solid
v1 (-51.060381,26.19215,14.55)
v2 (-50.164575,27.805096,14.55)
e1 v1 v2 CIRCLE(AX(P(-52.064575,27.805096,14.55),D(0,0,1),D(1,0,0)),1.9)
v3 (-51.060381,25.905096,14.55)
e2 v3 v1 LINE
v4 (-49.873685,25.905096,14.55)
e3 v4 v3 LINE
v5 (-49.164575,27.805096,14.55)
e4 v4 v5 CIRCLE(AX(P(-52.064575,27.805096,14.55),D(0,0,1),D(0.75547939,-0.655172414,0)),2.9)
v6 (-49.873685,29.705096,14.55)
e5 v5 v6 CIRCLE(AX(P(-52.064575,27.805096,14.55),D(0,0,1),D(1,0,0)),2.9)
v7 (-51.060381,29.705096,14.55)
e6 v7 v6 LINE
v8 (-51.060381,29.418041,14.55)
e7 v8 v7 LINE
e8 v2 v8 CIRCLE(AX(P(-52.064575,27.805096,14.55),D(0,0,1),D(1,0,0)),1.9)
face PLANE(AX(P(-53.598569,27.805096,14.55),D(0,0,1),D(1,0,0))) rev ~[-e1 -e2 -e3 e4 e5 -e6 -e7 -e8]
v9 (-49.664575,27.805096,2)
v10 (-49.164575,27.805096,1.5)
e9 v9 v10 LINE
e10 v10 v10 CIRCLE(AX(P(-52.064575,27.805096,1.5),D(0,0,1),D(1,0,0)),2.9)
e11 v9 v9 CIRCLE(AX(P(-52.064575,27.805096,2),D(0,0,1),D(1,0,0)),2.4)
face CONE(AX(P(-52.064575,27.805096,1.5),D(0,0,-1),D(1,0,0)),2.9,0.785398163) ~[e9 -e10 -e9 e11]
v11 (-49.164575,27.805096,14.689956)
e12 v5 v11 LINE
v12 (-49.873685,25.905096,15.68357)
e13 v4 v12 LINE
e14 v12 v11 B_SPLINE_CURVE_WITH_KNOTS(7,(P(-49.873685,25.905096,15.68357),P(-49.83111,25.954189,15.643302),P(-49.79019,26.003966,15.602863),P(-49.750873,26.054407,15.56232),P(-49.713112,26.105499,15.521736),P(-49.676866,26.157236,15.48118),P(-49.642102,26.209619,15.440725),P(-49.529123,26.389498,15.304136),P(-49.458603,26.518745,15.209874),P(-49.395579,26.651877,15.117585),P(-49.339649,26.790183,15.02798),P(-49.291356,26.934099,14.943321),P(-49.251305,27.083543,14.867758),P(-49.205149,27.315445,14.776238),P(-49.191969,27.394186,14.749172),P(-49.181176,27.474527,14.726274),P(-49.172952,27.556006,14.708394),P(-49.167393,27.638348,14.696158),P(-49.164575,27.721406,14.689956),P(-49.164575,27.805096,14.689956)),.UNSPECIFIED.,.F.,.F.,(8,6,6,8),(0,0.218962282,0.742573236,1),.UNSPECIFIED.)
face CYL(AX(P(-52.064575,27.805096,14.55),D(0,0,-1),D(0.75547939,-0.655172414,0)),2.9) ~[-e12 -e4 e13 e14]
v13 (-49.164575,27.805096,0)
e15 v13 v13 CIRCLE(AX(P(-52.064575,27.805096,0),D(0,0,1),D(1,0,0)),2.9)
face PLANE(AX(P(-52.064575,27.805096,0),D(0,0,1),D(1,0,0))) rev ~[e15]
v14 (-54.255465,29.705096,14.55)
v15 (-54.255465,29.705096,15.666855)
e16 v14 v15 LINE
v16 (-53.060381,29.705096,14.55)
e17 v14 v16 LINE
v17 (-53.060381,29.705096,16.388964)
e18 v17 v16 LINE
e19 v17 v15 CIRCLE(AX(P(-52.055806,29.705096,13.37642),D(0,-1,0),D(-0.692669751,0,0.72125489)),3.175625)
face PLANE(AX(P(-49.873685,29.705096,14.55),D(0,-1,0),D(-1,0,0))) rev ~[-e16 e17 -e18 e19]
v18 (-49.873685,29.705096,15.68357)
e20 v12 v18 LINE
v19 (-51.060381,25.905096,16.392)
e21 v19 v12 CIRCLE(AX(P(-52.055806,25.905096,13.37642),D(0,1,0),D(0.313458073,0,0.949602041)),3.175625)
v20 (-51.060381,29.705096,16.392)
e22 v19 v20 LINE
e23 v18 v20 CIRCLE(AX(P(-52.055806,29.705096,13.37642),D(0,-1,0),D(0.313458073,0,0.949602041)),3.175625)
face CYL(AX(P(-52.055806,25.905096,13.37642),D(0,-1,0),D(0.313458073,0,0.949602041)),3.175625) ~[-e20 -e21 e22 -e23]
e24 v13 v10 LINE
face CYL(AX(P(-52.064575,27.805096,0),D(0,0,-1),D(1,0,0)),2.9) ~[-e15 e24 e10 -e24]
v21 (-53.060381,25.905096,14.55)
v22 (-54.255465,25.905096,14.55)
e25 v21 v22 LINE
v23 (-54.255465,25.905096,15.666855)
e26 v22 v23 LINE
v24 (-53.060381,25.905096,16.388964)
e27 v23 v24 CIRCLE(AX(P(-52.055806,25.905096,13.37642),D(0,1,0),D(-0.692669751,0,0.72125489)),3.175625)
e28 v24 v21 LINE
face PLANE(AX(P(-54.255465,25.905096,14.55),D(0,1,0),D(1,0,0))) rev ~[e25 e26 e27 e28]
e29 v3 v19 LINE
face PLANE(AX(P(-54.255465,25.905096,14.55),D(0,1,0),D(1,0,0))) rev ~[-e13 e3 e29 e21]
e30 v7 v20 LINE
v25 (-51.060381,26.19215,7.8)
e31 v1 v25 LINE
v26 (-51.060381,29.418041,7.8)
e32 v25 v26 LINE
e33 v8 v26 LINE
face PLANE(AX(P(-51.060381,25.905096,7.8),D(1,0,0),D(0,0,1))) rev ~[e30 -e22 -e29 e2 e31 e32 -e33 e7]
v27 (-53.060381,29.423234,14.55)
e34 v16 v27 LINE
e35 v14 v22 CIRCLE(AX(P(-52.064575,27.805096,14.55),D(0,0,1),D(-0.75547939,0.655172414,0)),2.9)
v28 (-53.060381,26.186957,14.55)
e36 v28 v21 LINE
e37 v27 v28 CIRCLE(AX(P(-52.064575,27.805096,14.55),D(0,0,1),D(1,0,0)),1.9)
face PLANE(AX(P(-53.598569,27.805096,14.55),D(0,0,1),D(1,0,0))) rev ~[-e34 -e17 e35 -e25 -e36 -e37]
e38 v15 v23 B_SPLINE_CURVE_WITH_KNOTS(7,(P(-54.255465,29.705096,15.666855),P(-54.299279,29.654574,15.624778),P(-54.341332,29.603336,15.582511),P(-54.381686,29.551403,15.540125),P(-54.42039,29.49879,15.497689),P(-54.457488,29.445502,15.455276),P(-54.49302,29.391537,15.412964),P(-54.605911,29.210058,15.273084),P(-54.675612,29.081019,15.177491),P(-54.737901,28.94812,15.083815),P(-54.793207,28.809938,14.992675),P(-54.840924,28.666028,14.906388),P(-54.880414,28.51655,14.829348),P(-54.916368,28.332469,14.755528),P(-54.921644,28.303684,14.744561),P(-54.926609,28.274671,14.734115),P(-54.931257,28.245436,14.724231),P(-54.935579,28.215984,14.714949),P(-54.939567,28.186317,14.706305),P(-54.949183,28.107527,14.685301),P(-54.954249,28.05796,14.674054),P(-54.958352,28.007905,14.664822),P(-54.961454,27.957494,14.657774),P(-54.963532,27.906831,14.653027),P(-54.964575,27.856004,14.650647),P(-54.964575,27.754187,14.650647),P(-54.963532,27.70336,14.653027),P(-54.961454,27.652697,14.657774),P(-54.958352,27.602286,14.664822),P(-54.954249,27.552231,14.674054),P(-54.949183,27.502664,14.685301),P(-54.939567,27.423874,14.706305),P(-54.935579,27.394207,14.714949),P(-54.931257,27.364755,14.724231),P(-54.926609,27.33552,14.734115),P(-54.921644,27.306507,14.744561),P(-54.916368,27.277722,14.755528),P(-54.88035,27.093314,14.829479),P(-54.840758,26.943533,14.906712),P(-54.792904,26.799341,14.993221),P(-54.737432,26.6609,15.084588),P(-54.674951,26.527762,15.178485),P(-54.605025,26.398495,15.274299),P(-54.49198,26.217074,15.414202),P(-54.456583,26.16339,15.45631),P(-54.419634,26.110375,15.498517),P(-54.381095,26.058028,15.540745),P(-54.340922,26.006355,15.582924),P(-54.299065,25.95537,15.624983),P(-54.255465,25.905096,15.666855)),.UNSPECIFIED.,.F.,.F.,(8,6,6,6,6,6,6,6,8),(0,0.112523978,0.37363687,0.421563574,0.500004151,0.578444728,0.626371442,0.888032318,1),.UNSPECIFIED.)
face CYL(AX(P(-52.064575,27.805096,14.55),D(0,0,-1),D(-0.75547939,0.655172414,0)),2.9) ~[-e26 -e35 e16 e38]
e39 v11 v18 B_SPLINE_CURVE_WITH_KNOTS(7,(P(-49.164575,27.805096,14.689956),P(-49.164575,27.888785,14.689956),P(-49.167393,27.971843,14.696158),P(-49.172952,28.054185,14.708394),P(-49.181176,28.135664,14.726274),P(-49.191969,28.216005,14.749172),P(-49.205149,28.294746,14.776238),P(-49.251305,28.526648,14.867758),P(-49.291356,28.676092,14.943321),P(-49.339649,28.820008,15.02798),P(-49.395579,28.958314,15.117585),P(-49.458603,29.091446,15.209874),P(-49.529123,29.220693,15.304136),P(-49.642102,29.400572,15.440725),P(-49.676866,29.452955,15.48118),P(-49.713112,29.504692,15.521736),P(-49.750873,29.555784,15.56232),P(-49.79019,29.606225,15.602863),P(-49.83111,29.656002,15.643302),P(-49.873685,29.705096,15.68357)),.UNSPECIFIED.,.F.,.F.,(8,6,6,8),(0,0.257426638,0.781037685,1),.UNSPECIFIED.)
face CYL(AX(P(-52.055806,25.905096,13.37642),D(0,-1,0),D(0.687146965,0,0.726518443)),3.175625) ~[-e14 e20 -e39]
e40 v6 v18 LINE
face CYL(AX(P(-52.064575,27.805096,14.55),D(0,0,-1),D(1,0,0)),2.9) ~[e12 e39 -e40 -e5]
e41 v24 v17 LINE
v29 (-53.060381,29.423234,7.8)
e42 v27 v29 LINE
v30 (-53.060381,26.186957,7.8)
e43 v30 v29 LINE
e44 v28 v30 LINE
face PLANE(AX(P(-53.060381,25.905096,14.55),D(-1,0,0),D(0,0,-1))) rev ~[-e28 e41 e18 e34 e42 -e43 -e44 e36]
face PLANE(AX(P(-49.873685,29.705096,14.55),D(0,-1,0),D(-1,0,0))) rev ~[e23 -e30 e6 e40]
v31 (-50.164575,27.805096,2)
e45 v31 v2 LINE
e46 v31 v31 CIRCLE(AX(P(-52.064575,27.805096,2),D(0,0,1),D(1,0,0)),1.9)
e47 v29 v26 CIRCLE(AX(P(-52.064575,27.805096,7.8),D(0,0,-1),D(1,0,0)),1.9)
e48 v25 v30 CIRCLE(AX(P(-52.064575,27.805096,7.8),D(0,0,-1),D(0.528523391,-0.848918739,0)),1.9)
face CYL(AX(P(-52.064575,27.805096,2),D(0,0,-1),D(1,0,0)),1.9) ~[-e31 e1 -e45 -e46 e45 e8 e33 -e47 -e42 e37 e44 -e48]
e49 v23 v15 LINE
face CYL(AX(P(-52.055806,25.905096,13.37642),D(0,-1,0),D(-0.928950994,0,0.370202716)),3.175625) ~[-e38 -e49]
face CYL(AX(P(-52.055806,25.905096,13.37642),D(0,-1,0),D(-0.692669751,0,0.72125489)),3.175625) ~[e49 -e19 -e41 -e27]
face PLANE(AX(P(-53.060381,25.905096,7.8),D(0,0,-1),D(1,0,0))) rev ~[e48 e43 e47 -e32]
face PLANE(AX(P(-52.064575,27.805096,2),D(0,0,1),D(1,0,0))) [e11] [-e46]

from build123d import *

# Parameters (mm, degrees)
F0_R     = 2.9
F1_DEPTH = 2
F2_R     = 1.9
F3_DEPTH = 12.55
F5_DEPTH = 2
F7_DEPTH = 25
F8_SIZE  = 0.5
F9_DEPTH = 25


# Not quite as in the source:
# - a feature names something its author has since deleted; it is built from what else it names


with BuildPart() as f1:
    # F0 (on Top) → F1 (new body)
    with BuildSketch(Plane.XY):
        with Locations((-52.0645752549, 27.8050955385)):
            Circle(F0_R)
    extrude(amount=F1_DEPTH)

    # F2 (on face) → F3 (join)
    with BuildSketch(Plane.XY.offset(2)):
        with Locations((-52.0645752549, 27.8050955385)):
            Circle(F2_R)
    extrude(amount=F3_DEPTH)

    # F4 (on face) → F5 (join)
    with BuildSketch(Plane.XY.offset(14.55)):
        with BuildLine():
            Line((-52.0645752549, 29.7050955385), (-54.2554654849, 29.7050955385))
            ThreePointArc((-54.2554654849, 29.7050955385), (-54.9645752549, 27.8050955385), (-54.2554654849, 25.9050955385))
            Line((-54.2554654849, 25.9050955385), (-52.0645752549, 25.9050955385))
            ThreePointArc((-52.0645752549, 25.9050955385), (-53.9645752549, 27.8050955385), (-52.0645752549, 29.7050955385))
        make_face()
        with BuildLine():
            ThreePointArc((-50.1645752549, 27.8050955385), (-50.7210723707, 29.1485984228), (-52.0645752549, 29.7050955385))
            ThreePointArc((-52.0645752549, 29.7050955385), (-53.9645752549, 27.8050955385), (-52.0645752549, 25.9050955385))
            ThreePointArc((-52.0645752549, 25.9050955385), (-50.7210723707, 26.4615926542), (-50.1645752549, 27.8050955385))
        make_face()
        with BuildLine():
            ThreePointArc((-49.8736850249, 25.9050955385), (-49.347630126, 26.7910890462), (-49.1645752549, 27.8050955385))
            ThreePointArc((-49.1645752549, 27.8050955385), (-49.347630126, 28.8191020308), (-49.8736850249, 29.7050955385))
            Line((-49.8736850249, 29.7050955385), (-52.0645752549, 29.7050955385))
            ThreePointArc((-52.0645752549, 29.7050955385), (-50.7210723707, 29.1485984228), (-50.1645752549, 27.8050955385))
            ThreePointArc((-50.1645752549, 27.8050955385), (-50.7210723707, 26.4615926542), (-52.0645752549, 25.9050955385))
            Line((-52.0645752549, 25.9050955385), (-49.8736850249, 25.9050955385))
        make_face()
    extrude(amount=F5_DEPTH)

    # F6 (on face) + F5_face1 (on face) → F7 (cut)
    with BuildSketch(Plane.XZ.offset(-25.9050955385)):
        with BuildLine():
            ThreePointArc((-53.0603808121, 16.3889640887), (-52.6208294658, 16.5013745209), (-52.1697451564, 16.55))
            Line((-52.1697451564, 16.55), (-53.0603808121, 16.55))
            Line((-53.0603808121, 16.55), (-53.0603808121, 16.3889640887))
        make_face()
        with BuildLine():
            Line((-51.0603808121, 16.55), (-51.9418670563, 16.55))
            ThreePointArc((-51.9418670563, 16.55), (-51.4955264095, 16.5022285059), (-51.0603808121, 16.3919996636))
            Line((-51.0603808121, 16.3919996636), (-51.0603808121, 16.55))
        make_face()
        with BuildLine():
            Line((-51.0603808121, 16.55), (-51.0603808121, 16.3919996636))
            ThreePointArc((-51.0603808121, 16.3919996636), (-50.428025883, 16.1031256959), (-49.8736850249, 15.6835698131))
            Line((-49.8736850249, 15.6835698131), (-49.8736850249, 16.55))
            Line((-49.8736850249, 16.55), (-51.0603808121, 16.55))
        make_face()
        with BuildLine():
            Line((-49.1058061063, 16.5520446822), (-52.0558061063, 16.5520446822))
            ThreePointArc((-52.0558061063, 16.5520446822), (-51.9988274089, 16.5515334705), (-51.9418670563, 16.55))
            Line((-51.9418670563, 16.55), (-51.0603808121, 16.55))
            Line((-51.0603808121, 16.55), (-49.8736850249, 16.55))
            Line((-49.8736850249, 16.55), (-49.8736850249, 15.6835698131))
            ThreePointArc((-49.8736850249, 15.6835698131), (-49.4281162504, 15.1596303152), (-49.1058061063, 14.5520446822))
            Line((-49.1058061063, 14.5520446822), (-49.1058061063, 16.5520446822))
        make_face()
        with BuildLine():
            Line((-54.2554654849, 16.55), (-54.2554654849, 15.666854741))
            ThreePointArc((-54.2554654849, 15.666854741), (-53.6981031241, 16.0944069239), (-53.0603808121, 16.3889640887))
            Line((-53.0603808121, 16.3889640887), (-53.0603808121, 16.55))
            Line((-53.0603808121, 16.55), (-54.2554654849, 16.55))
        make_face()
        with BuildLine():
            Line((-52.0558061063, 16.5520446822), (-55.0058061063, 16.5520446822))
            Line((-55.0058061063, 16.5520446822), (-55.0058061063, 14.5520446822))
            ThreePointArc((-55.0058061063, 14.5520446822), (-54.6902791648, 15.1495936288), (-54.2554654849, 15.666854741))
            Line((-54.2554654849, 15.666854741), (-54.2554654849, 16.55))
            Line((-54.2554654849, 16.55), (-53.0603808121, 16.55))
            Line((-53.0603808121, 16.55), (-52.1697451564, 16.55))
            ThreePointArc((-52.1697451564, 16.55), (-52.1127848038, 16.5515334705), (-52.0558061063, 16.5520446822))
        make_face()
        Polygon((-52.0645752549, 14.55), (-53.0603808121, 14.55), (-53.0603808121, 7.8), (-51.0603808121, 7.8), (-51.0603808121, 13.8), (-51.0603808121, 14.55), align=None)
    with BuildSketch(Plane(origin=(-52.0645752549, 29.7050955385, 15.55), x_dir=(-1, 0, 0), z_dir=(0, 1, 0))):
        Polygon((-2.19089023, 1), (-2.19089023, -1), (0, -1), (2.19089023, -1), (2.19089023, 1), align=None)
    extrude(amount=-F7_DEPTH, dir=(0, -1, 0), mode=Mode.SUBTRACT)

    # F8
    f8_edges = [f1.edges().sort_by_distance(p)[0] for p in [
        (-54.964575, 27.805096, 2),
    ]]
    chamfer(f8_edges, length=F8_SIZE)

    # F6 (on face) → F9 (cut)
    with BuildSketch(Plane.XZ.offset(-25.9050955385)):
        with BuildLine():
            ThreePointArc((-51.0603808121, 16.3919996636), (-51.4955264095, 16.5022285059), (-51.9418670563, 16.55))
            Line((-51.9418670563, 16.55), (-52.1697451564, 16.55))
            ThreePointArc((-52.1697451564, 16.55), (-52.6208294658, 16.5013745209), (-53.0603808121, 16.3889640887))
            Line((-53.0603808121, 16.3889640887), (-53.0603808121, 14.5520446822))
            Line((-53.0603808121, 14.5520446822), (-53.0603808121, 14.55))
            Line((-53.0603808121, 14.55), (-52.0645752549, 14.55))
            Line((-52.0645752549, 14.55), (-51.0603808121, 14.55))
            Line((-51.0603808121, 14.55), (-51.0603808121, 14.5520446822))
            Line((-51.0603808121, 14.5520446822), (-51.0603808121, 16.3919996636))
        make_face()
        Polygon((-52.0645752549, 14.55), (-53.0603808121, 14.55), (-53.0603808121, 7.8), (-51.0603808121, 7.8), (-51.0603808121, 13.8), (-51.0603808121, 14.55), align=None)
    extrude(amount=-F9_DEPTH, mode=Mode.SUBTRACT)


solid = f1.part
